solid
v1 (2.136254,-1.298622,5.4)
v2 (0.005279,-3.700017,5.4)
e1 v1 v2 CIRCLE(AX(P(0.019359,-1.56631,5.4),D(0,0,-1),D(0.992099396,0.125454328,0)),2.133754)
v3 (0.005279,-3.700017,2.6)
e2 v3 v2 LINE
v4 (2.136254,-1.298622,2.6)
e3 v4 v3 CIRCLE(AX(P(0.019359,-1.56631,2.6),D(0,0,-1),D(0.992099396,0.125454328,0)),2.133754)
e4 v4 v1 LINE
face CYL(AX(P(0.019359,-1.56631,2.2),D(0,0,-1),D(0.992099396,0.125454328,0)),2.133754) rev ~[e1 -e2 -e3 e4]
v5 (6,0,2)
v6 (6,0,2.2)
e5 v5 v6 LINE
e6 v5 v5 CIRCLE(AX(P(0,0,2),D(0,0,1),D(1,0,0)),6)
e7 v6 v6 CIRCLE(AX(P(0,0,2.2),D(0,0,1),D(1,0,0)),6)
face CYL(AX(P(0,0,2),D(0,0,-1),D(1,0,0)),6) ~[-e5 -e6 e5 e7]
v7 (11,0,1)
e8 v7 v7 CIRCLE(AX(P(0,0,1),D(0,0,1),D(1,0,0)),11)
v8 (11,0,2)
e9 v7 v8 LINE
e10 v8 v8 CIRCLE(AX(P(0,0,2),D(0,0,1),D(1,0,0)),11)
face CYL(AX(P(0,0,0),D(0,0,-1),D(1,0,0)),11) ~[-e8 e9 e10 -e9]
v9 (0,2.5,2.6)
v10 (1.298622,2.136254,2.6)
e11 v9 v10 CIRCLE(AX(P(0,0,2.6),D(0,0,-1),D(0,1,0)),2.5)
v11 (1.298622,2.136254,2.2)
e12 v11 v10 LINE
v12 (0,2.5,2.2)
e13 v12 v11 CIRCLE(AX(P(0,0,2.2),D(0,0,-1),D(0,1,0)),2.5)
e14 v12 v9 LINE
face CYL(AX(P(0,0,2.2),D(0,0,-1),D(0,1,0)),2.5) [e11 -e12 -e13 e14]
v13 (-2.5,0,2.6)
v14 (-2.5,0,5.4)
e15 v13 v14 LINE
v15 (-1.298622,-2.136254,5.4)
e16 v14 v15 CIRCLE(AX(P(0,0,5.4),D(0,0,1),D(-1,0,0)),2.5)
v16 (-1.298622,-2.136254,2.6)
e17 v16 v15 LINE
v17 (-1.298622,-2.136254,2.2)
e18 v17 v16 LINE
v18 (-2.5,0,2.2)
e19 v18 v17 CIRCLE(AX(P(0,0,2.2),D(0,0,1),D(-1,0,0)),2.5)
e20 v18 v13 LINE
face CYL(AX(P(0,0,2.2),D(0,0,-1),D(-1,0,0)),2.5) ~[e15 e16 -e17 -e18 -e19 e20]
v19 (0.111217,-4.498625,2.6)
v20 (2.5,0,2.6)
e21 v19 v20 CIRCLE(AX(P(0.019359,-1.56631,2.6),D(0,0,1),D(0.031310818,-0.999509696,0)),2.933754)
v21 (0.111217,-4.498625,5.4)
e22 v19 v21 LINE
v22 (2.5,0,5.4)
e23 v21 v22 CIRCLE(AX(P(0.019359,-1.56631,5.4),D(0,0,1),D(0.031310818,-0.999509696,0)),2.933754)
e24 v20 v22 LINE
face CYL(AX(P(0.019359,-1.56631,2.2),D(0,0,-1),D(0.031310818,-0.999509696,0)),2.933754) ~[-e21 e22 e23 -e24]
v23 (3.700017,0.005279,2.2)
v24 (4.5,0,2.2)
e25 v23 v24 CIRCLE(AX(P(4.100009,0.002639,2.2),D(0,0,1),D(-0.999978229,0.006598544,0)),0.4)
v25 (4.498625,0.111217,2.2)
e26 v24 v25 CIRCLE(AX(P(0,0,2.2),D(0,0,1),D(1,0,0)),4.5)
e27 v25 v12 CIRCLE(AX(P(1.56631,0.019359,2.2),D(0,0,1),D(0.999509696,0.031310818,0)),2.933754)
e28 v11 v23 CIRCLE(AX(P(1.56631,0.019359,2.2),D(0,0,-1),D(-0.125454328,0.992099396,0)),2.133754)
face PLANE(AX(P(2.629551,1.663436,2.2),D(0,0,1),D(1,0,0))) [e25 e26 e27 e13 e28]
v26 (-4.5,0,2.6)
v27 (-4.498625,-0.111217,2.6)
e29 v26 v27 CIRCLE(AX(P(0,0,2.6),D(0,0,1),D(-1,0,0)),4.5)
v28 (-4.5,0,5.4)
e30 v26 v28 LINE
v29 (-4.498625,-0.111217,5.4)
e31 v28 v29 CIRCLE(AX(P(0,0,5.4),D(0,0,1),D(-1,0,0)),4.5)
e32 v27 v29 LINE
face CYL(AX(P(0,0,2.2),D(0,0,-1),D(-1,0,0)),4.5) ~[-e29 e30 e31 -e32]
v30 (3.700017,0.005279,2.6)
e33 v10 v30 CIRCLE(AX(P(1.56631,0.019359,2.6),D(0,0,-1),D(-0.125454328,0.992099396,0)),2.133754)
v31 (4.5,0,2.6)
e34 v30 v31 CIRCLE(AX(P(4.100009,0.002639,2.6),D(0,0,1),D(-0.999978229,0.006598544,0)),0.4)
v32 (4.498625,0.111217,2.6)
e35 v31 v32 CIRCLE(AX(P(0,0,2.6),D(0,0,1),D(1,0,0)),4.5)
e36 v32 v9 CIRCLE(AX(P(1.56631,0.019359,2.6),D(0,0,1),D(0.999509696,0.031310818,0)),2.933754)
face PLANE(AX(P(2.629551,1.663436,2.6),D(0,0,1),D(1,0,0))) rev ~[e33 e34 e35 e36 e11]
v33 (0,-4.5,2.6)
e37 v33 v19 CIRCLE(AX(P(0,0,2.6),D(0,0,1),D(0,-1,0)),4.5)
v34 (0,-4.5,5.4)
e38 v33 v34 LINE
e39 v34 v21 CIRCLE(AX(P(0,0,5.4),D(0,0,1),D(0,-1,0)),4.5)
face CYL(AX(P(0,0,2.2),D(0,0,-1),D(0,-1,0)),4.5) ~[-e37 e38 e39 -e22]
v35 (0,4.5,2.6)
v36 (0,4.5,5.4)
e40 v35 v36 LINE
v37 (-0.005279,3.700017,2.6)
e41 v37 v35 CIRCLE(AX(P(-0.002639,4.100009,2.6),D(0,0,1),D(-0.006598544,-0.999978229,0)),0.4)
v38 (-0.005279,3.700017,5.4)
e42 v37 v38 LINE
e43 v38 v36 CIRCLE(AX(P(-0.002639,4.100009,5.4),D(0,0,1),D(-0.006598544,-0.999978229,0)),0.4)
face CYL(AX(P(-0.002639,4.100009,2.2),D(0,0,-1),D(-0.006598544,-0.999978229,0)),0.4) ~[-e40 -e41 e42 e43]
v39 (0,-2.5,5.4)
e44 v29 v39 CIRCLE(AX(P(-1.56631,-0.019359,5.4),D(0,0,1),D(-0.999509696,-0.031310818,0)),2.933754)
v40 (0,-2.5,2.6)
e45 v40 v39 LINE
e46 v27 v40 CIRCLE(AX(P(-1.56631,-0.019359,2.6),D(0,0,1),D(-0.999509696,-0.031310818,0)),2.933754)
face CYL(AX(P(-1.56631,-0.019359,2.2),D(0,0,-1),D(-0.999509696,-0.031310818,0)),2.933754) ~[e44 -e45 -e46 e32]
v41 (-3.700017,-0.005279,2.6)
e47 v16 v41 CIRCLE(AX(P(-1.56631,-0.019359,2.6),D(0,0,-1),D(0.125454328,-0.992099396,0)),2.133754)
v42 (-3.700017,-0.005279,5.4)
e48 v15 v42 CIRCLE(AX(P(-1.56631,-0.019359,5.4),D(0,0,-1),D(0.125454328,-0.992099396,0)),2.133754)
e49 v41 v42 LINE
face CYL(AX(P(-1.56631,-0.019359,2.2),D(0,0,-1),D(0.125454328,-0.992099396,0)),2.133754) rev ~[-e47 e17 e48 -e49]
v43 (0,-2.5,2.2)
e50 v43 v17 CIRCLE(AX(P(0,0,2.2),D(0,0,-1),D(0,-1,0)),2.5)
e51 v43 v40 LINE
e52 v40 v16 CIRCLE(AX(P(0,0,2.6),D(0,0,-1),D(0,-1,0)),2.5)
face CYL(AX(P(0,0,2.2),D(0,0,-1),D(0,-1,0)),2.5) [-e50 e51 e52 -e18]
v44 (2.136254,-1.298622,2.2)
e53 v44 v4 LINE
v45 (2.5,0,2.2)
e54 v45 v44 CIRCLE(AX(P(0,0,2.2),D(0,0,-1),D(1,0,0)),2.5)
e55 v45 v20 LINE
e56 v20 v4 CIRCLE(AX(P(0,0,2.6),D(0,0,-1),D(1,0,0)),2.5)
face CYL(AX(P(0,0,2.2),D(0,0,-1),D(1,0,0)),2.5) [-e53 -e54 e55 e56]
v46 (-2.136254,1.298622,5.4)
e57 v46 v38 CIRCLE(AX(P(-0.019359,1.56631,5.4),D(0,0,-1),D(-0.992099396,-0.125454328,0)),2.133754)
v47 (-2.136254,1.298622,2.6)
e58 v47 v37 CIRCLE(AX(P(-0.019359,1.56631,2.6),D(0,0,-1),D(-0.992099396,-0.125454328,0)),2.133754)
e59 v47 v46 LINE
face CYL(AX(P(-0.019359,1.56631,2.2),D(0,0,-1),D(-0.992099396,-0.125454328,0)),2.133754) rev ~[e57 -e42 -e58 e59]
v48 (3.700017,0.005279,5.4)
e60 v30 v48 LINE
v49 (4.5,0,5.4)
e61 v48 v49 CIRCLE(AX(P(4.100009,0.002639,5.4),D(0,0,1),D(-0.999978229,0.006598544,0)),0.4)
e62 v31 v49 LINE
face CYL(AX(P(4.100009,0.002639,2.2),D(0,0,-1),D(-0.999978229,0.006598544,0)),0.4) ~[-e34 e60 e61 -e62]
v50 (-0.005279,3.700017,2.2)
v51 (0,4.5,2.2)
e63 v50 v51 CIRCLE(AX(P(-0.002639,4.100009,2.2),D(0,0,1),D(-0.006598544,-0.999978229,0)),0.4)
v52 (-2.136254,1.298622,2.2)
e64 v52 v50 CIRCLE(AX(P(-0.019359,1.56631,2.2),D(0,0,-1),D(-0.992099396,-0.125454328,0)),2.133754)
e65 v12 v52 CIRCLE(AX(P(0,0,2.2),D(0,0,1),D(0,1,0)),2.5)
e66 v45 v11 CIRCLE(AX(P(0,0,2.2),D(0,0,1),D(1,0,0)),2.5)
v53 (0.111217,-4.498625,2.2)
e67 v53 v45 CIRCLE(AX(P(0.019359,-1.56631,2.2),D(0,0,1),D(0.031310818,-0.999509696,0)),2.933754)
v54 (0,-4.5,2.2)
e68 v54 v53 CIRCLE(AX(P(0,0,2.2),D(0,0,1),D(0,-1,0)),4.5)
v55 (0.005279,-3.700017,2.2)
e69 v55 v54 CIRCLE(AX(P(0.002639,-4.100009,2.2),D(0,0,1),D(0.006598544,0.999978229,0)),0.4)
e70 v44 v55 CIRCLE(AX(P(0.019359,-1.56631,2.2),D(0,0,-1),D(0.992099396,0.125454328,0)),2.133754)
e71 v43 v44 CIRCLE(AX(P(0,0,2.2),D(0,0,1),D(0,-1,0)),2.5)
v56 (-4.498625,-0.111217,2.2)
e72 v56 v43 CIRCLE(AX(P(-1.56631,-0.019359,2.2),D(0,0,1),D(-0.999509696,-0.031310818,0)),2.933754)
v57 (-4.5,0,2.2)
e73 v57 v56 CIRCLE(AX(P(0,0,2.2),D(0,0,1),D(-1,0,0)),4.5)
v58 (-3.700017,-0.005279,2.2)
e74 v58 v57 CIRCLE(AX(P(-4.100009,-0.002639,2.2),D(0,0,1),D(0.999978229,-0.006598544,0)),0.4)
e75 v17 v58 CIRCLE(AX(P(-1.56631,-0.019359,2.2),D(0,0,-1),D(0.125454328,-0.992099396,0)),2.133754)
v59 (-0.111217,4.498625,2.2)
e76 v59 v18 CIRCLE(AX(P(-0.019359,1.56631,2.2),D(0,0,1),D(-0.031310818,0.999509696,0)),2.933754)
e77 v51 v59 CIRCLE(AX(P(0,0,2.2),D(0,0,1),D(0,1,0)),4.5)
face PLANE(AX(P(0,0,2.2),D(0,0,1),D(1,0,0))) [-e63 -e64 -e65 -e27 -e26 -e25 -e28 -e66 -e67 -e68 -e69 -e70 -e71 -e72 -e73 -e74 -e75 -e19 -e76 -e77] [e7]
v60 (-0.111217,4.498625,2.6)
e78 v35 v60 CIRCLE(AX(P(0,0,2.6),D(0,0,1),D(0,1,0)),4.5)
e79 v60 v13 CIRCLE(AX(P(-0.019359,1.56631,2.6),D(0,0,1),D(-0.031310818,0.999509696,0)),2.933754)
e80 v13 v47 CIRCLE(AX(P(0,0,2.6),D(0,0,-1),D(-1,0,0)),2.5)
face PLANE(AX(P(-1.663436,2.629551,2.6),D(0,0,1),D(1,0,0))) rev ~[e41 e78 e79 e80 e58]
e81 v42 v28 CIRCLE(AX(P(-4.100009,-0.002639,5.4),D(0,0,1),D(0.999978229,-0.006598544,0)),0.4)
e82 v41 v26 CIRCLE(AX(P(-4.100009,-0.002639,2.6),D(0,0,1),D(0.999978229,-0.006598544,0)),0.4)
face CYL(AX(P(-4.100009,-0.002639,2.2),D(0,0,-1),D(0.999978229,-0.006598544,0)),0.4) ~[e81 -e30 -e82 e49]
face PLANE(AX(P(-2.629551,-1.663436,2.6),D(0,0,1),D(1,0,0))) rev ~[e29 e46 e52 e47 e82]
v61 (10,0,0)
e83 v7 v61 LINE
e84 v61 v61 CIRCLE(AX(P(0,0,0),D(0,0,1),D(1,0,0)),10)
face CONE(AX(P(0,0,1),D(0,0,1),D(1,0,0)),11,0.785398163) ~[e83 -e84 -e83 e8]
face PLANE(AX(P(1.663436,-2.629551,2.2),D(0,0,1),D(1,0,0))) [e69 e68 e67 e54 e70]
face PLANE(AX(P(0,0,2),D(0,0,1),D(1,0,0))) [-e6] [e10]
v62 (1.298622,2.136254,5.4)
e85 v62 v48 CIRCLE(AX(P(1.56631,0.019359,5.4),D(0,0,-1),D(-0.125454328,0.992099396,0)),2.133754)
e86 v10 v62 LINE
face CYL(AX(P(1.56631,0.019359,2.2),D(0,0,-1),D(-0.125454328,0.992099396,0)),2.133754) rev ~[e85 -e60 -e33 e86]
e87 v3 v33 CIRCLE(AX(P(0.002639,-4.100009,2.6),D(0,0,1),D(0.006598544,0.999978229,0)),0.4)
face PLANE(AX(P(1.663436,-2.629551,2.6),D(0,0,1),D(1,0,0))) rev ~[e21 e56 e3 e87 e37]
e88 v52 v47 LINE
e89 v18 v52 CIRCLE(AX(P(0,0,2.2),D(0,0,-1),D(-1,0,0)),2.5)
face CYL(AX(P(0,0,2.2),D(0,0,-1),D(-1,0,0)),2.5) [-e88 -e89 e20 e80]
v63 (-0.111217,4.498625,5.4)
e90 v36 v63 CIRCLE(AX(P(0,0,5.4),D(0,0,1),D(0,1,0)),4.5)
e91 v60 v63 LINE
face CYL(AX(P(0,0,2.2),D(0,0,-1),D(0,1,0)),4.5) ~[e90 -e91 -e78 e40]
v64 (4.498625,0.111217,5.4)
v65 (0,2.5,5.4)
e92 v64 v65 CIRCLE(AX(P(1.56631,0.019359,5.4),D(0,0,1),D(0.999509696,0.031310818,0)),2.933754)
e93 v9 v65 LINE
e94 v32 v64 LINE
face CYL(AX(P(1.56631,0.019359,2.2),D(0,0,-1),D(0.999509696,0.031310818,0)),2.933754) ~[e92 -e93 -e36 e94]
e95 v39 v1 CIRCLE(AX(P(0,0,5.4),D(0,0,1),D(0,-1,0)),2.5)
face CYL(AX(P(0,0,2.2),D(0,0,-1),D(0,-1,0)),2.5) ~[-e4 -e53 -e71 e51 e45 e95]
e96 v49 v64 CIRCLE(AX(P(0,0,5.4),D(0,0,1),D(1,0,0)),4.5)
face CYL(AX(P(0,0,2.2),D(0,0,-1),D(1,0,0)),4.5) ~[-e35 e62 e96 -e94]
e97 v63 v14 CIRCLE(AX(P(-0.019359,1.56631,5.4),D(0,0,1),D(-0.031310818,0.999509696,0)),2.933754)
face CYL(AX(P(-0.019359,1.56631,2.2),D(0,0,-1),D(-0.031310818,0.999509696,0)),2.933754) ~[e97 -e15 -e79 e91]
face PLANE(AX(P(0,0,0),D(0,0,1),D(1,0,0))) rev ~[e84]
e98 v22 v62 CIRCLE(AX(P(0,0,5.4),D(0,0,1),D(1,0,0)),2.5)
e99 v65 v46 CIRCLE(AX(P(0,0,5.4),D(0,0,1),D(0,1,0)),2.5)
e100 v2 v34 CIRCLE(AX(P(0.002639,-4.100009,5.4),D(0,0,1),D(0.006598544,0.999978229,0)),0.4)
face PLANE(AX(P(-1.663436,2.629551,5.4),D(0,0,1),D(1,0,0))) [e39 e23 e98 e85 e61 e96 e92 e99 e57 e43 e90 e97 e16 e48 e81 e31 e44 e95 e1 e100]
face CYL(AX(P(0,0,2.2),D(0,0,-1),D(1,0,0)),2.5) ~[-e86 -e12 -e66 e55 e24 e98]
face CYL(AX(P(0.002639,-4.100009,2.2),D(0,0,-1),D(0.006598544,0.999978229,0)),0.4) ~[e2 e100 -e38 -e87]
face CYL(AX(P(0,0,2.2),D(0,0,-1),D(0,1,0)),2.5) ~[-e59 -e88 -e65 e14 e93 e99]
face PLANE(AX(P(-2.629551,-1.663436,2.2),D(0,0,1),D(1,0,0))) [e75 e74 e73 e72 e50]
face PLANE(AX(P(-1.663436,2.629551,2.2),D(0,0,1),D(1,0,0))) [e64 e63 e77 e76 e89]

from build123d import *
from build123d import SkipClean  # not in build123d's __all__

# Parameters (mm, degrees)
F0_R     = 11
F1_DEPTH = 2
F2_SIZE  = 1
F3_R     = 6
F4_DEPTH = 0.2
F6_DEPTH = 3.2
F7_DEPTH = 0.4


with BuildPart() as f1:
    # F0 (on Top) → F1 (new body)
    with BuildSketch(Plane.XY):
        Circle(F0_R)
    extrude(amount=F1_DEPTH)

    # F2
    f2_edges = [f1.edges().sort_by_distance(p)[0] for p in [
        (-11, 0, 0),
    ]]
    chamfer(f2_edges, length=F2_SIZE)

    # F3 (on face) → F4 (join)
    with BuildSketch(Plane.XY.offset(2)):
        Circle(F3_R)
    extrude(amount=F4_DEPTH)

    # F5 (on face) → F6 (join)
    with BuildSketch(Plane.XY.offset(2.2)):
        with BuildLine():
            ThreePointArc((-0.0052788349, 3.7000174165), (0.3973518743, 4.0973692908), (0, 4.5))
            ThreePointArc((0, 4.5), (-0.0556126102, 4.4996563466), (-0.1112167263, 4.4986254389))
            ThreePointArc((-0.1112167263, 4.4986254389), (-2.6104676107, 2.9421967987), (-2.5, 0))
            ThreePointArc((-2.5, 0), (-2.4073466074, 0.6743013511), (-2.1362541503, 1.2986216559))
            ThreePointArc((-2.1362541503, 1.2986216559), (-1.6153328632, 2.9825624536), (-0.0052788349, 3.7000174165))
        make_face()
        with BuildLine():
            ThreePointArc((3.7000174165, 0.0052788349), (4.0973692908, -0.3973518743), (4.5, 0))
            ThreePointArc((4.5, 0), (4.4996563466, 0.0556126102), (4.4986254389, 0.1112167263))
            ThreePointArc((4.4986254389, 0.1112167263), (2.9421967987, 2.6104676107), (0, 2.5))
            ThreePointArc((0, 2.5), (0.6743013511, 2.4073466074), (1.2986216559, 2.1362541503))
            ThreePointArc((1.2986216559, 2.1362541503), (2.9825624536, 1.6153328632), (3.7000174165, 0.0052788349))
        make_face()
        with BuildLine():
            ThreePointArc((0, -4.5), (0.0556126102, -4.4996563466), (0.1112167263, -4.4986254389))
            ThreePointArc((0.1112167263, -4.4986254389), (2.6104676107, -2.9421967987), (2.5, 0))
            ThreePointArc((2.5, 0), (2.4073466074, -0.6743013511), (2.1362541503, -1.2986216559))
            ThreePointArc((2.1362541503, -1.2986216559), (1.6153328632, -2.9825624536), (0.0052788349, -3.7000174165))
            ThreePointArc((0.0052788349, -3.7000174165), (-0.3973518743, -4.0973692908), (0, -4.5))
        make_face()
        with BuildLine():
            ThreePointArc((-4.5, 0), (-4.4996563466, -0.0556126102), (-4.4986254389, -0.1112167263))
            ThreePointArc((-4.4986254389, -0.1112167263), (-2.9421967987, -2.6104676107), (0, -2.5))
            ThreePointArc((0, -2.5), (-0.6743013511, -2.4073466074), (-1.2986216559, -2.1362541503))
            ThreePointArc((-1.2986216559, -2.1362541503), (-2.9825624536, -1.6153328632), (-3.7000174165, -0.0052788349))
            ThreePointArc((-3.7000174165, -0.0052788349), (-4.0973692908, 0.3973518743), (-4.5, 0))
        make_face()
        with BuildLine():
            ThreePointArc((1.2986216559, 2.1362541503), (0.6743013511, 2.4073466074), (0, 2.5))
            ThreePointArc((0, 2.5), (-1.2254480528, 2.1790541686), (-2.1362541503, 1.2986216559))
            ThreePointArc((-2.1362541503, 1.2986216559), (-2.4073466074, 0.6743013511), (-2.5, 0))
            ThreePointArc((-2.5, 0), (-2.1790541686, -1.2254480528), (-1.2986216559, -2.1362541503))
            ThreePointArc((-1.2986216559, -2.1362541503), (-0.6743013511, -2.4073466074), (0, -2.5))
            ThreePointArc((0, -2.5), (1.2254480528, -2.1790541686), (2.1362541503, -1.2986216559))
            ThreePointArc((2.1362541503, -1.2986216559), (2.4073466074, -0.6743013511), (2.5, 0))
            ThreePointArc((2.5, 0), (2.1790541686, 1.2254480528), (1.2986216559, 2.1362541503))
        make_face()
    extrude(amount=F6_DEPTH)

    # F5 (on face) → F7 (cut)
    with BuildSketch(Plane.XY.offset(2.2)):
        with BuildLine():
            ThreePointArc((-4.5, 0), (-4.4996563466, -0.0556126102), (-4.4986254389, -0.1112167263))
            ThreePointArc((-4.4986254389, -0.1112167263), (-2.9421967987, -2.6104676107), (0, -2.5))
            ThreePointArc((0, -2.5), (-0.6743013511, -2.4073466074), (-1.2986216559, -2.1362541503))
            ThreePointArc((-1.2986216559, -2.1362541503), (-2.9825624536, -1.6153328632), (-3.7000174165, -0.0052788349))
            ThreePointArc((-3.7000174165, -0.0052788349), (-4.0973692908, 0.3973518743), (-4.5, 0))
        make_face()
        with BuildLine():
            ThreePointArc((-0.0052788349, 3.7000174165), (0.3973518743, 4.0973692908), (0, 4.5))
            ThreePointArc((0, 4.5), (-0.0556126102, 4.4996563466), (-0.1112167263, 4.4986254389))
            ThreePointArc((-0.1112167263, 4.4986254389), (-2.6104676107, 2.9421967987), (-2.5, 0))
            ThreePointArc((-2.5, 0), (-2.4073466074, 0.6743013511), (-2.1362541503, 1.2986216559))
            ThreePointArc((-2.1362541503, 1.2986216559), (-1.6153328632, 2.9825624536), (-0.0052788349, 3.7000174165))
        make_face()
        with BuildLine():
            ThreePointArc((3.7000174165, 0.0052788349), (4.0973692908, -0.3973518743), (4.5, 0))
            ThreePointArc((4.5, 0), (4.4996563466, 0.0556126102), (4.4986254389, 0.1112167263))
            ThreePointArc((4.4986254389, 0.1112167263), (2.9421967987, 2.6104676107), (0, 2.5))
            ThreePointArc((0, 2.5), (0.6743013511, 2.4073466074), (1.2986216559, 2.1362541503))
            ThreePointArc((1.2986216559, 2.1362541503), (2.9825624536, 1.6153328632), (3.7000174165, 0.0052788349))
        make_face()
        with BuildLine():
            ThreePointArc((0, -4.5), (0.0556126102, -4.4996563466), (0.1112167263, -4.4986254389))
            ThreePointArc((0.1112167263, -4.4986254389), (2.6104676107, -2.9421967987), (2.5, 0))
            ThreePointArc((2.5, 0), (2.4073466074, -0.6743013511), (2.1362541503, -1.2986216559))
            ThreePointArc((2.1362541503, -1.2986216559), (1.6153328632, -2.9825624536), (0.0052788349, -3.7000174165))
            ThreePointArc((0.0052788349, -3.7000174165), (-0.3973518743, -4.0973692908), (0, -4.5))
        make_face()
    with SkipClean():  # cleaning this boolean's faces spoils the solid; the shape is the same uncleaned
        extrude(amount=F7_DEPTH, mode=Mode.SUBTRACT)


solid = f1.part
